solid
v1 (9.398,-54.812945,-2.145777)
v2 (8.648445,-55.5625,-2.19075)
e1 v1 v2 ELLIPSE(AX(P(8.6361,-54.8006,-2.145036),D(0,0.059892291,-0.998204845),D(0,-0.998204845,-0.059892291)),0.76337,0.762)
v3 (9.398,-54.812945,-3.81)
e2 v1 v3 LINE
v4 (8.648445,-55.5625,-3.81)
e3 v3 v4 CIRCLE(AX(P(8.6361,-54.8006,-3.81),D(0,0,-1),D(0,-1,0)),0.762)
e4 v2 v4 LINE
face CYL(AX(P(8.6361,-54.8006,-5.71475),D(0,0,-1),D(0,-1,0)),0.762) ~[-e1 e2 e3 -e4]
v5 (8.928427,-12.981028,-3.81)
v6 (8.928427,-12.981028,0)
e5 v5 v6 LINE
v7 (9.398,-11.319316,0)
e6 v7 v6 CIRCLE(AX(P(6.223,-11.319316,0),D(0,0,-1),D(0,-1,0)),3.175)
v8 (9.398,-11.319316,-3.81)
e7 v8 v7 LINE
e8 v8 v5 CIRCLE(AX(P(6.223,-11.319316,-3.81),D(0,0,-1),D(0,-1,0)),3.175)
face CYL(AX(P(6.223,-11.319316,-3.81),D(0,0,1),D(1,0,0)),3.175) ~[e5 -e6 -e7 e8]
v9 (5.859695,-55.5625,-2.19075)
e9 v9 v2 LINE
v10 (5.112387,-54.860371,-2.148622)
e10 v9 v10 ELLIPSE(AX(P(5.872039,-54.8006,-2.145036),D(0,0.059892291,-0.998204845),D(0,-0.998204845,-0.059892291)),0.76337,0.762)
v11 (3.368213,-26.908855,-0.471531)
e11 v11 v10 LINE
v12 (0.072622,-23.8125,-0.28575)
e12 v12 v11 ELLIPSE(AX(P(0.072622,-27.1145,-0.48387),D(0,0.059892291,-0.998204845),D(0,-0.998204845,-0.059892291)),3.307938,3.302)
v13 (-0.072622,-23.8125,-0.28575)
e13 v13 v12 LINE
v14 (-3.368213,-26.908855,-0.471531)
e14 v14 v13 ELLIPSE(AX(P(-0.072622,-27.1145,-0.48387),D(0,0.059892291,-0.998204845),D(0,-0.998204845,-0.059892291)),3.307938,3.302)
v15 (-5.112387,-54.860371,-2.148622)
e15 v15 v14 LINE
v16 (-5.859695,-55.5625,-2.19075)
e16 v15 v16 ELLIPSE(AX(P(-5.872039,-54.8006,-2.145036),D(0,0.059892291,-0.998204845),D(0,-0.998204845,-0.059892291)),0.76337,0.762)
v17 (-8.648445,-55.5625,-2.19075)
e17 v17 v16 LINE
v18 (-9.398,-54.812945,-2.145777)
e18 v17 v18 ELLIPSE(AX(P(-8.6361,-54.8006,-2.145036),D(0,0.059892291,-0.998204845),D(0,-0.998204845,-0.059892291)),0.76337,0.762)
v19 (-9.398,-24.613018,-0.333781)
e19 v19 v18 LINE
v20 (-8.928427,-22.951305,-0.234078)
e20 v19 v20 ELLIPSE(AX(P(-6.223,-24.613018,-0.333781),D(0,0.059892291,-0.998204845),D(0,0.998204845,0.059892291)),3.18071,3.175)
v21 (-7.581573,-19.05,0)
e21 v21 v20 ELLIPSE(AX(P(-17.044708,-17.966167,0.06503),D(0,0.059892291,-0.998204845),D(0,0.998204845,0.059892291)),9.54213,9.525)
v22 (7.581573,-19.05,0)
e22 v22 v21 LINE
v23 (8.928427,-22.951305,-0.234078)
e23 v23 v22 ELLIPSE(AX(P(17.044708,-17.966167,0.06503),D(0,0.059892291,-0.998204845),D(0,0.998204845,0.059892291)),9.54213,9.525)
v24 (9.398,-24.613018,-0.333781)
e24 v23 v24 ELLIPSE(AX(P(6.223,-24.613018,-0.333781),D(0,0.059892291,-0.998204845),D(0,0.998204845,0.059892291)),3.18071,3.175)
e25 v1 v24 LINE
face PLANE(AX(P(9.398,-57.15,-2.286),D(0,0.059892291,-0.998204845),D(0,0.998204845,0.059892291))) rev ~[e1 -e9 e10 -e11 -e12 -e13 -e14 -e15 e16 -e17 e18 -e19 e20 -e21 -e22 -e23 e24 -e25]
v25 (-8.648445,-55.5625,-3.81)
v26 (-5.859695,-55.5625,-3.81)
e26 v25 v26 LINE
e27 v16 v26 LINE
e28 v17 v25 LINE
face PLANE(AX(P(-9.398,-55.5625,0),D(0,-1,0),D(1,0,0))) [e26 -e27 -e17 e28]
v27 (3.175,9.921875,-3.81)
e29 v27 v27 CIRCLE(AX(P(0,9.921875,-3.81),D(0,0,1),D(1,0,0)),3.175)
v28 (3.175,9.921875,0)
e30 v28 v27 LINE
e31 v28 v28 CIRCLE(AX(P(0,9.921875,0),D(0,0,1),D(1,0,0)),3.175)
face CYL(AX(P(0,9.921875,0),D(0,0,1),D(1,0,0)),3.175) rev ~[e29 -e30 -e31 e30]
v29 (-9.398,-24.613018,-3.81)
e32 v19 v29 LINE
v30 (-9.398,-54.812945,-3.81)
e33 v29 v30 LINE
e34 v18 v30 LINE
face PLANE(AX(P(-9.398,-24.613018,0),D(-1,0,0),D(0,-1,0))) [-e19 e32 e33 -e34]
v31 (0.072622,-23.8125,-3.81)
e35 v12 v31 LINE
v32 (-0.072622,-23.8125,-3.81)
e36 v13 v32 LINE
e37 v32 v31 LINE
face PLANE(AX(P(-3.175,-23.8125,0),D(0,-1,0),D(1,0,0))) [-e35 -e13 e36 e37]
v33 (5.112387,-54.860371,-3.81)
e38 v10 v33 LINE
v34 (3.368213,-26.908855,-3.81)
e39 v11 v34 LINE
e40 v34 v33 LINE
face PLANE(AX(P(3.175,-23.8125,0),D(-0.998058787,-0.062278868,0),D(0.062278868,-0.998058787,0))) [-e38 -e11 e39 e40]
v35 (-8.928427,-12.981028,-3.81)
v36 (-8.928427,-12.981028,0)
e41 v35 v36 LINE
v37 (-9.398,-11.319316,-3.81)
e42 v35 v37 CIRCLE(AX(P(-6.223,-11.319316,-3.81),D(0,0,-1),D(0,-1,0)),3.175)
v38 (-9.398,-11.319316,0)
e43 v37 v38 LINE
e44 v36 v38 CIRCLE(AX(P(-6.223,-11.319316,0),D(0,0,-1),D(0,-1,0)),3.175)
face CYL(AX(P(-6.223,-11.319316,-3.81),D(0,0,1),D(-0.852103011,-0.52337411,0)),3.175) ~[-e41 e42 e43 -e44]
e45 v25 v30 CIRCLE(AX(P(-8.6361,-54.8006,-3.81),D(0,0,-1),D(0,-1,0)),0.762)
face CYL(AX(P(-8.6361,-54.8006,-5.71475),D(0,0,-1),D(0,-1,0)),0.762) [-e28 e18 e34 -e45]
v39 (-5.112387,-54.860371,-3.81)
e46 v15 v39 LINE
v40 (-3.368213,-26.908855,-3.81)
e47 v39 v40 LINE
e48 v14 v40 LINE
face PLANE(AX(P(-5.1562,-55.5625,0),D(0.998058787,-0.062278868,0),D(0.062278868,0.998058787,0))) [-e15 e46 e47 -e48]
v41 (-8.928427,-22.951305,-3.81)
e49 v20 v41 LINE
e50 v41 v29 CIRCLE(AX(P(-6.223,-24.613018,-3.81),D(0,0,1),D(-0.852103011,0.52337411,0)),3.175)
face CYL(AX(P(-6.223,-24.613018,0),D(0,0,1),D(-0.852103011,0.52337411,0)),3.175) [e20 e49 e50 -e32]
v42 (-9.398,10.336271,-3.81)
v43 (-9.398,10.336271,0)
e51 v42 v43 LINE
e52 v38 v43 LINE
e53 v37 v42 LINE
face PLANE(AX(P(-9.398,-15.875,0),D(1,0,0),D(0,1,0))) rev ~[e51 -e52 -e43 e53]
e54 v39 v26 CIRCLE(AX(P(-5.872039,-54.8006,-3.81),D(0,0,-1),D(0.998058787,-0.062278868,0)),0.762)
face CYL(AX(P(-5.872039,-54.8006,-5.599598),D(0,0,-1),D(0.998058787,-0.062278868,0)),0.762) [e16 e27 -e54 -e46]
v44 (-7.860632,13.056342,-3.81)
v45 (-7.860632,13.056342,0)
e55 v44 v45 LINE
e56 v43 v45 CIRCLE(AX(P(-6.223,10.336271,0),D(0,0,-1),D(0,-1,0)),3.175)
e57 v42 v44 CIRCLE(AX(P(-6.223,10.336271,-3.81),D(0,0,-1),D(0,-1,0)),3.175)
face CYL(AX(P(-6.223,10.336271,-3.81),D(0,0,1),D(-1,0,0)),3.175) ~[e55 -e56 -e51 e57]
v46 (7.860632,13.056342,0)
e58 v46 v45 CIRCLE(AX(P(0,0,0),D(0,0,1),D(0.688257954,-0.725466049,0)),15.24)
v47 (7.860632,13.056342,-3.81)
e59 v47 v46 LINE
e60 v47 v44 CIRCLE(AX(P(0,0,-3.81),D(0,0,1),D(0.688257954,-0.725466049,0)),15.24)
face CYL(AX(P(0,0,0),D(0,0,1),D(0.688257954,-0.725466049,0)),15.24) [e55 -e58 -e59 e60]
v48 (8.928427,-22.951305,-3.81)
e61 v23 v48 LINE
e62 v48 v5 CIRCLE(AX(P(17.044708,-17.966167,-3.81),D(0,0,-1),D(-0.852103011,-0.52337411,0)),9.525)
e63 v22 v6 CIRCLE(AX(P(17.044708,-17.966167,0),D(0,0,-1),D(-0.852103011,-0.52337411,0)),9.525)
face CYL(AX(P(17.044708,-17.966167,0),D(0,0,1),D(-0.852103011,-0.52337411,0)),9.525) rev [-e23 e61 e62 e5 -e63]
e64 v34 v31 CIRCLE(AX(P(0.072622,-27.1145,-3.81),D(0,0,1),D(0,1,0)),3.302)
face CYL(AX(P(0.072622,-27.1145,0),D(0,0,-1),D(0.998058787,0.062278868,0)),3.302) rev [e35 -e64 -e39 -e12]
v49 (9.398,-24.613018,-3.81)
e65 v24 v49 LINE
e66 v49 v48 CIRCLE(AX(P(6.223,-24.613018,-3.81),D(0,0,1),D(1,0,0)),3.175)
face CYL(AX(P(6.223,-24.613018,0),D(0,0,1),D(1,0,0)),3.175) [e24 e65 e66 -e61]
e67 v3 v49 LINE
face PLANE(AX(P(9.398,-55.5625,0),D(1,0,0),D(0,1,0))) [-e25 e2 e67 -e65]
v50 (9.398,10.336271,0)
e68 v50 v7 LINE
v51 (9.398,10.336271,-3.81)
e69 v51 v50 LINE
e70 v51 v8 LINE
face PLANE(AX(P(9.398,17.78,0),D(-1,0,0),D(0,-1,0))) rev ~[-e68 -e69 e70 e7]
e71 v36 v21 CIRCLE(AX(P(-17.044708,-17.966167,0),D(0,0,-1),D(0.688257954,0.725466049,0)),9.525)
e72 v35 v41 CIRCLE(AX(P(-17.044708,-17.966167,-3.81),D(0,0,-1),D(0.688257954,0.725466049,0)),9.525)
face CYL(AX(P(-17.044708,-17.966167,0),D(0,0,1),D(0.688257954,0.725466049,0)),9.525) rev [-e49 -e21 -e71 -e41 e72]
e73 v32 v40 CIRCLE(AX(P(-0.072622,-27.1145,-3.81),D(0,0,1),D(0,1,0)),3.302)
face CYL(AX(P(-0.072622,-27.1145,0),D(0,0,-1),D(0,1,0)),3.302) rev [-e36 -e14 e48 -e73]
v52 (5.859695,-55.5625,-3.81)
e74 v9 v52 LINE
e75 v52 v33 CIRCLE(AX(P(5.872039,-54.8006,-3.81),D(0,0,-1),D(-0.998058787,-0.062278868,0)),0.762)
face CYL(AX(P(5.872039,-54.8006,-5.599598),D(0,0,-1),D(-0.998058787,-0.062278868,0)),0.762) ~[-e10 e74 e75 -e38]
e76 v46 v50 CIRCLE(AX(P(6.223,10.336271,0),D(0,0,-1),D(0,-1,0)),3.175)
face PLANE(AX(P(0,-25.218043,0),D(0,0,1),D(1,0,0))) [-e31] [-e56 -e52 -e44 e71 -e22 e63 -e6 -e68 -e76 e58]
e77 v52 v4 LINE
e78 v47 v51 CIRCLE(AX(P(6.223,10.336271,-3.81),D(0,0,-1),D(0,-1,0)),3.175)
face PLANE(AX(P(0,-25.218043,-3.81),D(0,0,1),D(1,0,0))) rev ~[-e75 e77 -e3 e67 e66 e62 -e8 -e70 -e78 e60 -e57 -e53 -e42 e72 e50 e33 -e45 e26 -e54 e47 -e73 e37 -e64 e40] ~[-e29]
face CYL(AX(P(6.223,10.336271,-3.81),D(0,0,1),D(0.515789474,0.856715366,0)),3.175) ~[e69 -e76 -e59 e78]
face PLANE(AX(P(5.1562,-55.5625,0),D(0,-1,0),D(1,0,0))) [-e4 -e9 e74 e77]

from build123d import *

# Parameters (mm, degrees)
F0_R        = 3.175
F1_DEPTH    = 3.81
F2_R        = 3.302
F3_T1_DEPTH = 7.6195000328
F3_T3_DEPTH = 7.3891966687
F5_DEPTH    = 3.811
F6_R        = 3.175
F8_DEPTH    = 18.797


# Not quite as in the source:
# - a fillet or chamfer that OpenCascade refuses, or shapes differently, is made with other operations: its cross-section is extruded or revolved along the edge and cut away or added


with BuildPart() as f1:
    # F0 (on Top) → F1 (new body)
    with BuildSketch(Plane.XY):
        with BuildLine():
            ThreePointArc((8.9284270597, -22.9513050998), (7.6006411438, -16.7271260659), (10.4890512239, -11.0561025874))
            ThreePointArc((10.4890512239, -11.0561025874), (0, 15.24), (-10.4890512239, -11.0561025874))
            ThreePointArc((-10.4890512239, -11.0561025874), (-7.6006411438, -16.7271260659), (-8.9284270597, -22.9513050998))
            ThreePointArc((-8.9284270597, -22.9513050998), (-9.2783523459, -23.7496251472), (-9.398, -24.6130178983))
            Line((-9.398, -24.6130178983), (-9.398, -55.5625))
            Line((-9.398, -55.5625), (-5.1562, -55.5625))
            Line((-5.1562, -55.5625), (-3.175, -23.8125))
            Line((-3.175, -23.8125), (3.175, -23.8125))
            Line((3.175, -23.8125), (5.1562, -55.5625))
            Line((5.1562, -55.5625), (9.398, -55.5625))
            Line((9.398, -55.5625), (9.398, -24.6130178983))
            ThreePointArc((9.398, -24.6130178983), (9.2783523459, -23.7496251472), (8.9284270597, -22.9513050998))
        make_face()
        with Locations((0, 9.921875)):
            Circle(F0_R, mode=Mode.SUBTRACT)
    extrude(amount=-F1_DEPTH)

    # F2
    f2_edges = [f1.edges().sort_by_distance(p)[0] for p in [
        (-3.175, -23.8125, -1.905),
        (3.175, -23.8125, -1.905),
    ]]
    fillet(f2_edges, radius=F2_R)

    # F3: fillet of radius 0.762 on 4 edges, made by hand

    # F3_s2 → F3_t1 (cut)
    with BuildSketch(Plane.XY.offset(-5.7147500164)):
        with BuildLine():
            ThreePointArc((8.6361, -55.5626), (9.1749153673, -55.3394153673), (9.3981, -54.8006))
            Line((9.3981, -54.8006), (9.41334, -54.8006))
            ThreePointArc((9.41334, -54.8006), (9.41324, -55.18155), (9.41324, -55.5625))
            Line((9.41324, -55.5625), (9.398, -55.57774))
            ThreePointArc((9.398, -55.57774), (9.01705, -55.57774), (8.6361, -55.57784))
            Line((8.6361, -55.57784), (8.6361, -55.5626))
        make_face()
        with BuildLine():
            ThreePointArc((-8.6361, -55.5626), (-9.1749153673, -55.3394153673), (-9.3981, -54.8006))
            Line((-9.3981, -54.8006), (-9.41334, -54.8006))
            ThreePointArc((-9.41334, -54.8006), (-9.41324, -55.18155), (-9.41324, -55.5625))
            Line((-9.41324, -55.5625), (-9.398, -55.57774))
            ThreePointArc((-9.398, -55.57774), (-9.01705, -55.57774), (-8.6361, -55.57784))
            Line((-8.6361, -55.57784), (-8.6361, -55.5626))
        make_face()
    extrude(amount=F3_T1_DEPTH, mode=Mode.SUBTRACT)

    # F3_s4 → F3_t3 (cut)
    with BuildSketch(Plane.XY.offset(-5.5995983343)):
        with BuildLine():
            ThreePointArc((-5.111518531, -54.8480564977), (-5.350272066, -55.3559403691), (-5.8720393267, -55.5626))
            Line((-5.8720393267, -55.5626), (-5.8720393267, -55.57784))
            ThreePointArc((-5.8720393267, -55.57784), (-5.5141196634, -55.57774), (-5.1562, -55.57774))
            Line((-5.1562, -55.57774), (-5.1409895841, -55.56344913))
            ThreePointArc((-5.1409895841, -55.56344913), (-5.1186987525, -55.2062242648), (-5.096308115, -54.8490056276))
            Line((-5.096308115, -54.8490056276), (-5.111518531, -54.8480564977))
        make_face()
        with BuildLine():
            ThreePointArc((5.111518531, -54.8480564977), (5.350272066, -55.3559403691), (5.8720393267, -55.5626))
            Line((5.8720393267, -55.5626), (5.8720393267, -55.57784))
            ThreePointArc((5.8720393267, -55.57784), (5.5141196634, -55.57774), (5.1562, -55.57774))
            Line((5.1562, -55.57774), (5.1409895841, -55.56344913))
            ThreePointArc((5.1409895841, -55.56344913), (5.1186987525, -55.2062242648), (5.096308115, -54.8490056276))
            Line((5.096308115, -54.8490056276), (5.111518531, -54.8480564977))
        make_face()
    extrude(amount=F3_T3_DEPTH, mode=Mode.SUBTRACT)

    # F4 (on face) → F5 (cut, through all)
    with BuildSketch(Plane.XY):
        Polygon((-9.398, -15.875), (-9.398, 17.78), (9.398, 17.78), (9.398, -15.875), (19.05, -15.875), (19.05, 20.32), (-19.05, 20.32), (-19.05, -15.875), align=None)
    extrude(amount=-F5_DEPTH, mode=Mode.SUBTRACT)

    # F6
    f6_edges = [f1.edges().sort_by_distance(p)[0] for p in [
        (9.398, 11.9973, -1.905),
        (-9.398, 11.9973, -1.905),
        (-9.398, -12.286952, -1.905),
        (9.398, -12.286952, -1.905),
    ]]
    fillet(f6_edges, radius=F6_R)

    # F7 (on face) → F8 (cut, through all)
    with BuildSketch(Plane.YZ.offset(9.398)):
        Polygon((-57.15, 0), (-57.15, -2.286), (-19.05, 0), align=None)
    extrude(amount=-F8_DEPTH, mode=Mode.SUBTRACT)


solid = f1.part
